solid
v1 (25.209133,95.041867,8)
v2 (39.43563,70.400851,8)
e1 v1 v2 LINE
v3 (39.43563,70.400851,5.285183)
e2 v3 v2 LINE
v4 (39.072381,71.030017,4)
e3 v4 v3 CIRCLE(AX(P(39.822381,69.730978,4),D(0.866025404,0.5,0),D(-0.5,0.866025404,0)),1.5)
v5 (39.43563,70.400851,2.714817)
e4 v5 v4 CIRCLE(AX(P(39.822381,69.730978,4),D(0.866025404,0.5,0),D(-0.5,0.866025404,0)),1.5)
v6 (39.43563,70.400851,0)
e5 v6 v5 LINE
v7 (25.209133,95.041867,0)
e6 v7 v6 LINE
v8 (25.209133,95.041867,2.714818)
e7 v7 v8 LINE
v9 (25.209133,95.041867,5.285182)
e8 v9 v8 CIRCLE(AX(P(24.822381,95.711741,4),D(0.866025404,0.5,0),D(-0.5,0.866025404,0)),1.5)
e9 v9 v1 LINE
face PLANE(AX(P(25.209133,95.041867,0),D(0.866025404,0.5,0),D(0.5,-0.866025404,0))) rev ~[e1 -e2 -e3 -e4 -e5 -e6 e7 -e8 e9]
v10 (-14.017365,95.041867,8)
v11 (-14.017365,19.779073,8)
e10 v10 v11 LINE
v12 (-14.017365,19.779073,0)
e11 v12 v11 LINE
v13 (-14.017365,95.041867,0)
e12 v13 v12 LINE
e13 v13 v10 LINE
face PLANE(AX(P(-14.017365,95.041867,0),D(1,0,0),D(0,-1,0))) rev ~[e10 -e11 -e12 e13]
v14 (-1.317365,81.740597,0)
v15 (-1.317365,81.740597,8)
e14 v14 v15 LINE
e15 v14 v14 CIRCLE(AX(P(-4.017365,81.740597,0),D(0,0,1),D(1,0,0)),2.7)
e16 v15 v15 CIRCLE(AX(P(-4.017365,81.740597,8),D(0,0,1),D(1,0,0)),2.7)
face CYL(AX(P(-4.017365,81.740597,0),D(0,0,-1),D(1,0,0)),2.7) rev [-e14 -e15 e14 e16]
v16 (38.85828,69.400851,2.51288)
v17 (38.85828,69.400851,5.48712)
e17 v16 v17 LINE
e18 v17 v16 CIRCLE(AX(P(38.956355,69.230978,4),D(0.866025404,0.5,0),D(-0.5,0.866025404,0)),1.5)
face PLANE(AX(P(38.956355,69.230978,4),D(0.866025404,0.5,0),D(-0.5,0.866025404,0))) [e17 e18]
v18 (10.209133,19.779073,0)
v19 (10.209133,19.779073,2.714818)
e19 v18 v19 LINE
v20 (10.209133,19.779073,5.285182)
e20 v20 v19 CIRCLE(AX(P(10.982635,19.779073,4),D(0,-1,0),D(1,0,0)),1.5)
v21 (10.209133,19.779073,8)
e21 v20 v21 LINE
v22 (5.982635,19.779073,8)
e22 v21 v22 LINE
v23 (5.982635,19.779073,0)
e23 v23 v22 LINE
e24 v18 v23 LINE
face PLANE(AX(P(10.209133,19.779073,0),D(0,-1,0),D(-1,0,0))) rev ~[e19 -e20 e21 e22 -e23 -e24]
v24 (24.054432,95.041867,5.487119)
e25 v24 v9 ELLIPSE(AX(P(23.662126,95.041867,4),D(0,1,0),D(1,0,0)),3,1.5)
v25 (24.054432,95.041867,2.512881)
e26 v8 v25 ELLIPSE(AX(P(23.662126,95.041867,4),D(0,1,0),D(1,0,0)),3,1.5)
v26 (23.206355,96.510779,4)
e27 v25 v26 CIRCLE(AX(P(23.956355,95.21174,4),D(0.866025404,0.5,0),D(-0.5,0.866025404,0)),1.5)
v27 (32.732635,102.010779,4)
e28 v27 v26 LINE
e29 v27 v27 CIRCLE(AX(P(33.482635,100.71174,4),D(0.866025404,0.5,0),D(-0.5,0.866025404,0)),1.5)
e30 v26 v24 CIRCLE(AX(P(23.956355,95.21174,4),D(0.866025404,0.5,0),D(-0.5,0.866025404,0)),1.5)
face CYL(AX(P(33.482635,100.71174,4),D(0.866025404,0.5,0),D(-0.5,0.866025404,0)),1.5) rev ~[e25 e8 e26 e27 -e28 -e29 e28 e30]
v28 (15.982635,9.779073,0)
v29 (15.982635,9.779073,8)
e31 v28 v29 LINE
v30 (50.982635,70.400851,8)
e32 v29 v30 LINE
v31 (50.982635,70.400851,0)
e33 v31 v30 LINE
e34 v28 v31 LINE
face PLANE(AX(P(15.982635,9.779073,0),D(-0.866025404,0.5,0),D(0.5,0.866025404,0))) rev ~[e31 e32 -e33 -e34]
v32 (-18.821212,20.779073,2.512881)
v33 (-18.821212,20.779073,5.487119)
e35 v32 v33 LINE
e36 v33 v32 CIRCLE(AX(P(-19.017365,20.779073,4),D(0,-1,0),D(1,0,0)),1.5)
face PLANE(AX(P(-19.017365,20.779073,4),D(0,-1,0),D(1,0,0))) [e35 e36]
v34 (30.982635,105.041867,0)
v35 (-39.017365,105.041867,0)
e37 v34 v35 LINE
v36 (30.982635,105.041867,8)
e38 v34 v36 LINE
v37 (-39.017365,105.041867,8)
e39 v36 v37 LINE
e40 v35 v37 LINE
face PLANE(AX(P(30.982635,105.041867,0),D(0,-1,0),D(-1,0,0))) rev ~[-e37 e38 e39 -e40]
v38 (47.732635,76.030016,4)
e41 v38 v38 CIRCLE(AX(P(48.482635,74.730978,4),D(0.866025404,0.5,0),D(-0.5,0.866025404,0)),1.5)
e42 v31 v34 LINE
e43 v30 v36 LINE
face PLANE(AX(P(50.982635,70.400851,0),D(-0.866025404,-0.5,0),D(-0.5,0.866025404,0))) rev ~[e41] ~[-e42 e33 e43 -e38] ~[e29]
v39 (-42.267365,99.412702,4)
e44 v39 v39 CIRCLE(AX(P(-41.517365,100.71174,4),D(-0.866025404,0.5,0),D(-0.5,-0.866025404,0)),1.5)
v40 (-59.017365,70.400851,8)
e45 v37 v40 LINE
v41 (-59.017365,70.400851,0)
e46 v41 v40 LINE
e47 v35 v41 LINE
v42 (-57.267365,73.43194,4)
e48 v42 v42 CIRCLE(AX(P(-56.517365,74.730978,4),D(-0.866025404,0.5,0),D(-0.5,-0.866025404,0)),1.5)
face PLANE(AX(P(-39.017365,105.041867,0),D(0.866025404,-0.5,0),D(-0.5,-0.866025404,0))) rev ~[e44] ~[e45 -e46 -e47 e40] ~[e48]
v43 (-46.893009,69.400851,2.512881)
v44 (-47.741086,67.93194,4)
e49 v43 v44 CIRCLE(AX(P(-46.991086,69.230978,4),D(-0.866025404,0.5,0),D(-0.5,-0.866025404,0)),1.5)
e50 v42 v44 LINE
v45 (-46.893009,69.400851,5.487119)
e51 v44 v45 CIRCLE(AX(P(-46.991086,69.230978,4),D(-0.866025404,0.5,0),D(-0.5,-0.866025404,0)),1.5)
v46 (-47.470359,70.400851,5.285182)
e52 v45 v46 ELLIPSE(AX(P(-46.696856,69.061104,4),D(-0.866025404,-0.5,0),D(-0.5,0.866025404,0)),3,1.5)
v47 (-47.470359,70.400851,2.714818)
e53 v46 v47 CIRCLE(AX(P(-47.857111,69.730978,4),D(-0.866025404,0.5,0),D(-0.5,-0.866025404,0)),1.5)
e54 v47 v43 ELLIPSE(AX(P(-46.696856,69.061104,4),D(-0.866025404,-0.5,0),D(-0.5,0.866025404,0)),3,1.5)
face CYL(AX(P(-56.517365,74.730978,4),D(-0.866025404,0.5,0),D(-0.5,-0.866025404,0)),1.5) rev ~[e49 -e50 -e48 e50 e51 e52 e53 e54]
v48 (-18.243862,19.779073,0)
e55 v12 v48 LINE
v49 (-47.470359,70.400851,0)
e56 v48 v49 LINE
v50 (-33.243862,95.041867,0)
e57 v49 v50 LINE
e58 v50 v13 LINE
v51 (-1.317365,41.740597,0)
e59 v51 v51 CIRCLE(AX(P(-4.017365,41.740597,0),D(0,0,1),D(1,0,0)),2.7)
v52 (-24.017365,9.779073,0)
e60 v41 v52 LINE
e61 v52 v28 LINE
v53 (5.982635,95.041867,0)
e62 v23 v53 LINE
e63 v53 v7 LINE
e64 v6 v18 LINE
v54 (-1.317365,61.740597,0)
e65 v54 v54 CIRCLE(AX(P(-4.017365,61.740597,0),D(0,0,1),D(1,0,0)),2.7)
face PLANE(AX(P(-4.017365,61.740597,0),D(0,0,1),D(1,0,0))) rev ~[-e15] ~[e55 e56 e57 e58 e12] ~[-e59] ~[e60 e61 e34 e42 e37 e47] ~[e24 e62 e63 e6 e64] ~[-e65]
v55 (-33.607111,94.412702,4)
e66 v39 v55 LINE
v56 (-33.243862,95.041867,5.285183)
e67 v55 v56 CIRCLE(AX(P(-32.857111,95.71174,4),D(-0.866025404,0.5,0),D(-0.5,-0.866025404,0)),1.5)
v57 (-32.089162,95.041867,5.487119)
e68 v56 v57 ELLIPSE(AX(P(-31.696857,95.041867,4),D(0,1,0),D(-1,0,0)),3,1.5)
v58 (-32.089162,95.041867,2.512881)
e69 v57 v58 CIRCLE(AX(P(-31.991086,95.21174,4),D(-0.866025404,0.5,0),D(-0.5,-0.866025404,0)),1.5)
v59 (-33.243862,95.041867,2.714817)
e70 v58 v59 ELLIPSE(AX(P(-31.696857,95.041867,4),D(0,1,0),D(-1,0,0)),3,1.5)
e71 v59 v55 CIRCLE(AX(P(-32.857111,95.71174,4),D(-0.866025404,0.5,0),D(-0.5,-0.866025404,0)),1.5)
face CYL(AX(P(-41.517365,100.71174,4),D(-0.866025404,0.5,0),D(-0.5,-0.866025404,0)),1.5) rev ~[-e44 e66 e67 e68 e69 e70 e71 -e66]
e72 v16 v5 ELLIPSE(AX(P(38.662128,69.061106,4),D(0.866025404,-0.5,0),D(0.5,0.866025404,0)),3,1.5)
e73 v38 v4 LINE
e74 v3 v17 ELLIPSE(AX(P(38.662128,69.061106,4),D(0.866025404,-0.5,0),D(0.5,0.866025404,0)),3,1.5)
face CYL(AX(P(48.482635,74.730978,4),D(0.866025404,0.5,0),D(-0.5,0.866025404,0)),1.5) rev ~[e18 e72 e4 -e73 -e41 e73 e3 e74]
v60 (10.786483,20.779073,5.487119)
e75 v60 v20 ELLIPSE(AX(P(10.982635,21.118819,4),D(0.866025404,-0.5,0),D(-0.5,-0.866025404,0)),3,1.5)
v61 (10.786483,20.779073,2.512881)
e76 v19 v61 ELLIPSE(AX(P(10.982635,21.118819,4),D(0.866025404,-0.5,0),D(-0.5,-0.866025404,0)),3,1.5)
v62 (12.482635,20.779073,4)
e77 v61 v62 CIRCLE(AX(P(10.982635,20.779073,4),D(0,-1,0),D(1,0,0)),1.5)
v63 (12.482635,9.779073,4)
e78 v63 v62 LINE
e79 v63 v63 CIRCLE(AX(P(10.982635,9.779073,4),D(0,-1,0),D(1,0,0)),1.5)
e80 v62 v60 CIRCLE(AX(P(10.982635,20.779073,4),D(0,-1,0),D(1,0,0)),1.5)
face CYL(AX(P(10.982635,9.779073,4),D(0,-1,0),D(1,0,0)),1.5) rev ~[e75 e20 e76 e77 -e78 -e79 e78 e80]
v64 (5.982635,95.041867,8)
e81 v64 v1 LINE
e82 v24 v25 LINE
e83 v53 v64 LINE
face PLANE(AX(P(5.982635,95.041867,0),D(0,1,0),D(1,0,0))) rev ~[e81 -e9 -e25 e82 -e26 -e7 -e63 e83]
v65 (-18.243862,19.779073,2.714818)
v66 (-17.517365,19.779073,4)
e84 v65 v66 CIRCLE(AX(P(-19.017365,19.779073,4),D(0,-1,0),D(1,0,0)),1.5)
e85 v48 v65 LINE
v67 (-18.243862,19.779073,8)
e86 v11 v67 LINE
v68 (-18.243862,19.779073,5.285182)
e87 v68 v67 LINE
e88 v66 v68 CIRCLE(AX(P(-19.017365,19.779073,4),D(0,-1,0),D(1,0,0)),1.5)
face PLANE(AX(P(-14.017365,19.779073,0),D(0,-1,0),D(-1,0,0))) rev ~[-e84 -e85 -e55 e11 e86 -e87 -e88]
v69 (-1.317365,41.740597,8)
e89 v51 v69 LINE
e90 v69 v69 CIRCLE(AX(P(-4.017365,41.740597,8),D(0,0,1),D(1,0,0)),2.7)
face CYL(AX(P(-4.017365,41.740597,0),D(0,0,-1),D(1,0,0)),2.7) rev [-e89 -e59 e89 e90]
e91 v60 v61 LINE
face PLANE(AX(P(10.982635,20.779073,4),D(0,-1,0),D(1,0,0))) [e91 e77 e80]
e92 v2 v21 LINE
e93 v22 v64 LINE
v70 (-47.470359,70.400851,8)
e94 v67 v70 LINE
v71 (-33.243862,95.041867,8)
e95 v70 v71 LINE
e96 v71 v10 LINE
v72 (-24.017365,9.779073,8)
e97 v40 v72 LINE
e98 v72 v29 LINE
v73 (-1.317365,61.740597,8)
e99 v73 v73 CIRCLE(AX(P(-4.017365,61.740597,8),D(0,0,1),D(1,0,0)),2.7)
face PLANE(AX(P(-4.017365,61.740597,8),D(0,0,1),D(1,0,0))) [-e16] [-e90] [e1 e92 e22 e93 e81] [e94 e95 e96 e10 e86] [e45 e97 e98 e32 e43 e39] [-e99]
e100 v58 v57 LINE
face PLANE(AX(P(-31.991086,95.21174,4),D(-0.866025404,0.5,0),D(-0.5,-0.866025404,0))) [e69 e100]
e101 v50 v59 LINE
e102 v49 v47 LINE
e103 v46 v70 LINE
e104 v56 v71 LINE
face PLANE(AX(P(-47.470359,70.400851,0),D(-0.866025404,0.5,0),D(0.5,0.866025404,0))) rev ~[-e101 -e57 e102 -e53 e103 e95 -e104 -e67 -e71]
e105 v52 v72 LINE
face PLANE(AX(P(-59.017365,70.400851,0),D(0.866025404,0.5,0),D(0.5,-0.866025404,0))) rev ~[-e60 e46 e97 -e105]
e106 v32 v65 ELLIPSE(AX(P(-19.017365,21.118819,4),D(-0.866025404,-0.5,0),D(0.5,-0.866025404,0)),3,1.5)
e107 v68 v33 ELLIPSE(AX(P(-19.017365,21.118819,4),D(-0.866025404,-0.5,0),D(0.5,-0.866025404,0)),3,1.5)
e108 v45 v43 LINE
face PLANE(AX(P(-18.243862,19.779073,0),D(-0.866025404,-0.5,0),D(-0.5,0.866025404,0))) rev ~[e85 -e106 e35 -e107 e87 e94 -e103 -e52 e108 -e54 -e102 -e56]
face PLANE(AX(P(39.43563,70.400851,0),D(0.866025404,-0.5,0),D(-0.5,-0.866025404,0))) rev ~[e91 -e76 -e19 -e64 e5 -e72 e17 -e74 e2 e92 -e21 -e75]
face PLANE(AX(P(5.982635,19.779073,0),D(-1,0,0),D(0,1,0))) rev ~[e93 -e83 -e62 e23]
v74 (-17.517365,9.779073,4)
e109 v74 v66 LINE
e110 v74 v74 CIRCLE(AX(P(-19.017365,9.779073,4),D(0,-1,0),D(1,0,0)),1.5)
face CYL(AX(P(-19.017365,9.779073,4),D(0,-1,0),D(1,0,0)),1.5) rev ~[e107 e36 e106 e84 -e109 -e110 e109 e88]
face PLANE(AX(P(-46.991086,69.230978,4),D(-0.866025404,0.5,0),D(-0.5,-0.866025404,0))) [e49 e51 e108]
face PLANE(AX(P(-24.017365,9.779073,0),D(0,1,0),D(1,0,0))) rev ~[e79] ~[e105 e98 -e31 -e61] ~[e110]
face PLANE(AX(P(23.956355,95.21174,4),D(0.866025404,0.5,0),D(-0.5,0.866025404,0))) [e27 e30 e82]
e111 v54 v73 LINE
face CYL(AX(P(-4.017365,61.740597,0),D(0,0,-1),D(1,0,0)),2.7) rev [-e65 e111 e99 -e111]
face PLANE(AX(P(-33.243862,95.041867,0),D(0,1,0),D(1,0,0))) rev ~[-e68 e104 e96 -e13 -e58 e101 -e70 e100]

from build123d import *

# Parameters (mm, degrees)
F0_R            = 2.7
F1_DEPTH        = 8
F2_R            = 1.5
F3_DEPTH        = 11
F3_COPIES_COUNT = 3


# Not quite as in the source:
# - a pattern or mirror of a feature is missing from the dataset's text; its kind, count and spacing are read off the source's solid


with BuildPart() as f1:
    # F0 (on Top) → F1 (new body)
    with BuildSketch(Plane.XY):
        Polygon((30.9826352704, 105.0418671526), (-39.0173647296, 105.0418671526), (-59.0173647296, 70.4008510012), (-24.0173647296, 9.7790727363), (15.9826352704, 9.7790727363), (50.9826352704, 70.4008510012), align=None)
        with Locations((-4.0173647296, 41.7405969634)):
            Circle(F0_R, mode=Mode.SUBTRACT)
        Polygon((-14.0173647296, 19.7790727363), (-18.2438620377, 19.7790727363), (-47.4703593458, 70.4008510012), (-33.2438620377, 95.0418671526), (-14.0173647296, 95.0418671526), align=None, mode=Mode.SUBTRACT)
        Polygon((25.2091325785, 95.0418671526), (39.4356298866, 70.4008510012), (10.2091325785, 19.7790727363), (5.9826352704, 19.7790727363), (5.9826352704, 95.0418671526), align=None, mode=Mode.SUBTRACT)
        with Locations((-4.0173647296, 61.7405969634)):
            Circle(F0_R, mode=Mode.SUBTRACT)
        with Locations((-4.0173647296, 81.7405969634)):
            Circle(F0_R, mode=Mode.SUBTRACT)
    extrude(amount=F1_DEPTH)

    # F2 (on face) → F3 (cut)
    with BuildSketch(Plane.XZ.offset(-9.7790727363)):
        with Locations((10.9826352704, 4)):
            Circle(F2_R)
        with Locations((-19.0173647296, 4)):
            Circle(F2_R)
    f3 = extrude(amount=-F3_DEPTH, mode=Mode.SUBTRACT)

    # F3_copies: F3 ×3 about axis
    f3_copies_axis = Axis((-4.017365, 61.740597, 0), (0, 0, 1))
    for i in range(1, F3_COPIES_COUNT):
        add(f3.rotate(f3_copies_axis, i * 360 / F3_COPIES_COUNT), mode=Mode.SUBTRACT)


solid = f1.part
